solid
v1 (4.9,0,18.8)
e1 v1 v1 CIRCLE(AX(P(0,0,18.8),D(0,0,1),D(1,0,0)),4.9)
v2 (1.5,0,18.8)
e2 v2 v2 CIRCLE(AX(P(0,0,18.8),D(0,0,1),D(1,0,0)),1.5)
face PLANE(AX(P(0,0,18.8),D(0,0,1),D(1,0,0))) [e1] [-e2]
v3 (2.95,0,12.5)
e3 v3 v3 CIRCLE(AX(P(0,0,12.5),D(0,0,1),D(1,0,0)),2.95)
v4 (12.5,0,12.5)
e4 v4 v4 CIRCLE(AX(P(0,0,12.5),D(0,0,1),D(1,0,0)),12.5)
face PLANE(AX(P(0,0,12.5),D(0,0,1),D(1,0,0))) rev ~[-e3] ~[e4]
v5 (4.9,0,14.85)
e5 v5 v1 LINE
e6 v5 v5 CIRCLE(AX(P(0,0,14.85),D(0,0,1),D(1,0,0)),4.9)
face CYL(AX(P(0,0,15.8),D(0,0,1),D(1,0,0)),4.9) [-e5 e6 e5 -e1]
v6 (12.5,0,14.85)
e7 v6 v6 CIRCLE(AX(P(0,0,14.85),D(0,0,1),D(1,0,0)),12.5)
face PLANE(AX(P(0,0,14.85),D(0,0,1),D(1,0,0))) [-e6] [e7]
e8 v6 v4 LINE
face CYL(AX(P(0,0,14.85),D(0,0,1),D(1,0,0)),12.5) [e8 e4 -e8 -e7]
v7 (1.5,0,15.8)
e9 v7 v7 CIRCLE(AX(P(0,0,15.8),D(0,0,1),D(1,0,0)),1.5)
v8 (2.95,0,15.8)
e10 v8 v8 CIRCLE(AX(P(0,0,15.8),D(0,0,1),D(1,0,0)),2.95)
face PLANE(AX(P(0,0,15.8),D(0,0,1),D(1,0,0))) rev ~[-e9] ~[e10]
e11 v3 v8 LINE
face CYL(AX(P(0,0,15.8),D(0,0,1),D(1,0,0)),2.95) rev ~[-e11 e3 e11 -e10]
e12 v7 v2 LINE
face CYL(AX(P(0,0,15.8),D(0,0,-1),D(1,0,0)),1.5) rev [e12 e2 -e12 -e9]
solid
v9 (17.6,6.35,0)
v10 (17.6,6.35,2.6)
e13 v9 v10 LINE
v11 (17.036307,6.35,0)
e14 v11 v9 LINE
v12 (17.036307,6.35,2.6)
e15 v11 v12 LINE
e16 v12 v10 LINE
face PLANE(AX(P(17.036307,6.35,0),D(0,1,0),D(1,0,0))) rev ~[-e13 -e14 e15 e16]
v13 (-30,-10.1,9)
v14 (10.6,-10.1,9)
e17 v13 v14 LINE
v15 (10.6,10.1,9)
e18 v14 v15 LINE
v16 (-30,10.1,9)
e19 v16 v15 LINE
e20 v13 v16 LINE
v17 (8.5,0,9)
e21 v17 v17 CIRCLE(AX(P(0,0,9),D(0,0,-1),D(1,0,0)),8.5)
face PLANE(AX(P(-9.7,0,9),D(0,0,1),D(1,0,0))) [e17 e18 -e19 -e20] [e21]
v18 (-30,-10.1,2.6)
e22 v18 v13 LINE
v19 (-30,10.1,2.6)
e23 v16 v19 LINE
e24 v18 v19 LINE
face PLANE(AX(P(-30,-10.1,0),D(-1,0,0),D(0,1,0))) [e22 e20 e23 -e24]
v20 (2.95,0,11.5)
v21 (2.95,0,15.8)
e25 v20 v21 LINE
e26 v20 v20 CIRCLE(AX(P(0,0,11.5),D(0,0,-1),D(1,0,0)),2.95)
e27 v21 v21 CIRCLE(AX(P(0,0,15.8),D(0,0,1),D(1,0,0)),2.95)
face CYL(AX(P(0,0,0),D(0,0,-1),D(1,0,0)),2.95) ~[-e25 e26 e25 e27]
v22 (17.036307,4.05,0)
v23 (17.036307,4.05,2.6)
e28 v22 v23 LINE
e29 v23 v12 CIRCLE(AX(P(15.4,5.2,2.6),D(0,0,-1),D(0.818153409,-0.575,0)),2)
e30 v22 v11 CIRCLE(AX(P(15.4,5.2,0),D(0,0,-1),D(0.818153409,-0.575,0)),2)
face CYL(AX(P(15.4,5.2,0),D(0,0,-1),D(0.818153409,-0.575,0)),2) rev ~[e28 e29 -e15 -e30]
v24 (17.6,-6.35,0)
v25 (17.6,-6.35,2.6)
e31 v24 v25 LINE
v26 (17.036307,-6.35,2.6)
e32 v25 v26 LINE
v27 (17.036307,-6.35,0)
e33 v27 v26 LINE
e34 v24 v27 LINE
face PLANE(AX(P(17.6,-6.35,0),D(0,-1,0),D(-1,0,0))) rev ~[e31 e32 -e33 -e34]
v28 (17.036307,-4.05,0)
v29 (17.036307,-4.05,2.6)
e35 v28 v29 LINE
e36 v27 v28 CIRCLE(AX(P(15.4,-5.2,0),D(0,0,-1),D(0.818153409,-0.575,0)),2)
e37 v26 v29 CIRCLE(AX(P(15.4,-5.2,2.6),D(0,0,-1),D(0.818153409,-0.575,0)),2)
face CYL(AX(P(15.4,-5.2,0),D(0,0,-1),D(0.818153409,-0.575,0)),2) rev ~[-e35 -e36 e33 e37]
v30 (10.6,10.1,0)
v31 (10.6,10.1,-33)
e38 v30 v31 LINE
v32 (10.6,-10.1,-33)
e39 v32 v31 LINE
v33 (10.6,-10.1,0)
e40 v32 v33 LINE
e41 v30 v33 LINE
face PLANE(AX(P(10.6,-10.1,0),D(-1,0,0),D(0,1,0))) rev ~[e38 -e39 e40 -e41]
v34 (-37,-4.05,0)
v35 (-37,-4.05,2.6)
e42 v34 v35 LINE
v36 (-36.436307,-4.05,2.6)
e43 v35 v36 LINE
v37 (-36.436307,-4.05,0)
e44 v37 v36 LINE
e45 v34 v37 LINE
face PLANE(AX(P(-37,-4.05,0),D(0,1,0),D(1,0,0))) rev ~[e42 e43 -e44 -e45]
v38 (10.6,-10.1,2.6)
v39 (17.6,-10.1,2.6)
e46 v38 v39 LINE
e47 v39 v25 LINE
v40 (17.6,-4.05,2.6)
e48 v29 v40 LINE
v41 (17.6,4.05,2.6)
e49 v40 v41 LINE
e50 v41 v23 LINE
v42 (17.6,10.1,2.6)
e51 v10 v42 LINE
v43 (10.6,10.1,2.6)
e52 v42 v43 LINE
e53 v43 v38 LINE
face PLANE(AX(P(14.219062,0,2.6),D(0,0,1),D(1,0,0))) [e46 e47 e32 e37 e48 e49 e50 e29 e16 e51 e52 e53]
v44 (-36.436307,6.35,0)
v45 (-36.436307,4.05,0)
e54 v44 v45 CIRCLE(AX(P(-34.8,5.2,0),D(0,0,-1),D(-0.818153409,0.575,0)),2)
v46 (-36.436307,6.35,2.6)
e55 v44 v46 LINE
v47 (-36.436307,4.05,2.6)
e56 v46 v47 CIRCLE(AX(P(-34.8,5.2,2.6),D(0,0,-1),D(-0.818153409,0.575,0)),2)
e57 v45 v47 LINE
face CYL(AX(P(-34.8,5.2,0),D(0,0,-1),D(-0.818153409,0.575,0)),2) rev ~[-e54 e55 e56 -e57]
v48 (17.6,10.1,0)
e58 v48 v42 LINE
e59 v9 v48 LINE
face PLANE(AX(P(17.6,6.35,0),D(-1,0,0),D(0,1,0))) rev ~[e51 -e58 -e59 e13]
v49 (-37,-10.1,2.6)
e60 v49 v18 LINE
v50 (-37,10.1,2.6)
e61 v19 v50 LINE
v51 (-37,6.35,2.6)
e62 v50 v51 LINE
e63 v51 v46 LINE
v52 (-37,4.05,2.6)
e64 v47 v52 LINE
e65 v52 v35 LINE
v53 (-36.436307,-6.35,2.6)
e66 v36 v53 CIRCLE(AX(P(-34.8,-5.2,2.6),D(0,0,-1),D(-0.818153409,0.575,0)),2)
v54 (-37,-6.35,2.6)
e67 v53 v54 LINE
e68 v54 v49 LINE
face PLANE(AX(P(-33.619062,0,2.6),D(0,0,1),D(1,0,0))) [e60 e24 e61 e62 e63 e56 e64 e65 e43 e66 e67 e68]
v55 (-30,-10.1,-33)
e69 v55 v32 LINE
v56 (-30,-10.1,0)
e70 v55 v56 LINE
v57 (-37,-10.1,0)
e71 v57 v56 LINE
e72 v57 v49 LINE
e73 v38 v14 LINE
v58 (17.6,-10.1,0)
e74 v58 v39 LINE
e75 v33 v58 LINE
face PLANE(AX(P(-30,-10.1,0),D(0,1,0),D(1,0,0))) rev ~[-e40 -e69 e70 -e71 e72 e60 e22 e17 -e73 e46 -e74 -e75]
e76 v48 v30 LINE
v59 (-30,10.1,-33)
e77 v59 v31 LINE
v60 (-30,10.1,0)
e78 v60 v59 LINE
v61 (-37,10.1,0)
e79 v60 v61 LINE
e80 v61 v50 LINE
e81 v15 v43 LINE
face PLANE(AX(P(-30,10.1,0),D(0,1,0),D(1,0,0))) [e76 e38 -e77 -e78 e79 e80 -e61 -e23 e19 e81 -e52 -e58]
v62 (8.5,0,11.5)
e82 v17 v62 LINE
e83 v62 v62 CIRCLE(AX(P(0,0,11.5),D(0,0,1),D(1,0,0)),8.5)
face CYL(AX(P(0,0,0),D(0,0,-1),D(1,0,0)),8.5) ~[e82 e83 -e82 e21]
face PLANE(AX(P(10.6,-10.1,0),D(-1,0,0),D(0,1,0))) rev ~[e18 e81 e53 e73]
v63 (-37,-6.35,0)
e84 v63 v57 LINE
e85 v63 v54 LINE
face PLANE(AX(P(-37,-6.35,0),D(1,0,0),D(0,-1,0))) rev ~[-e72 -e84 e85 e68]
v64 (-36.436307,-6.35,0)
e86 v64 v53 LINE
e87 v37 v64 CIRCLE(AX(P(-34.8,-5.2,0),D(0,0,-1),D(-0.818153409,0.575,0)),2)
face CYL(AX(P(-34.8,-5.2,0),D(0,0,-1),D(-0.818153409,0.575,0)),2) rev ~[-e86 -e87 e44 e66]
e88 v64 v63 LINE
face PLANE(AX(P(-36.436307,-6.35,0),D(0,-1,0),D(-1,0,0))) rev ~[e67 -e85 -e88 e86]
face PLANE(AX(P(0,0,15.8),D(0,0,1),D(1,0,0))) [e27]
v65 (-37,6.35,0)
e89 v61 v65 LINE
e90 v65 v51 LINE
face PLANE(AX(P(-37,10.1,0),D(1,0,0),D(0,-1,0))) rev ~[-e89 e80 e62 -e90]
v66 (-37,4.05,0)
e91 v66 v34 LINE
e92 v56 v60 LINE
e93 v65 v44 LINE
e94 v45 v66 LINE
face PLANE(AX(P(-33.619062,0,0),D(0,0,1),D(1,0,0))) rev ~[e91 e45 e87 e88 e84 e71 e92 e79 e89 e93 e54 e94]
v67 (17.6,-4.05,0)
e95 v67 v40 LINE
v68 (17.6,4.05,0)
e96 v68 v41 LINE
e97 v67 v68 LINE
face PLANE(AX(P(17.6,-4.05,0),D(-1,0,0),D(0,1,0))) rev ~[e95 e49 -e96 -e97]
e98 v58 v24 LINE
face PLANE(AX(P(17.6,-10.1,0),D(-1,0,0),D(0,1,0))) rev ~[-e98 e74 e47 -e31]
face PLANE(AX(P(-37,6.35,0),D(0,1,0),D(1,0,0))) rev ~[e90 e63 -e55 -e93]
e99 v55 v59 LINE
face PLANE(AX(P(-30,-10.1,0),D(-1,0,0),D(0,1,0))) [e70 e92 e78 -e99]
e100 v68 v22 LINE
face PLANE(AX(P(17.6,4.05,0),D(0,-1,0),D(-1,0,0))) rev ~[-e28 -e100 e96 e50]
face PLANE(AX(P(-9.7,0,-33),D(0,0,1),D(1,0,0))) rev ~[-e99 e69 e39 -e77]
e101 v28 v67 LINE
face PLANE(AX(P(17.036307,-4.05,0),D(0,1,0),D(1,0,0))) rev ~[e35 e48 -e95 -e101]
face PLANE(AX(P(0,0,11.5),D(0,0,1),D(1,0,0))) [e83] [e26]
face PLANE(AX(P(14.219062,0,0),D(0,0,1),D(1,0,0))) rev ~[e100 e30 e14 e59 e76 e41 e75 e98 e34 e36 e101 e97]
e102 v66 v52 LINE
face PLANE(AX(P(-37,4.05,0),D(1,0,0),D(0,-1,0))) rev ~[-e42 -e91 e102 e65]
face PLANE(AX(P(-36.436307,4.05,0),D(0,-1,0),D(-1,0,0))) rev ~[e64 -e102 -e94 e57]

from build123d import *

# Parameters (mm, degrees)
F0_W          = 40.6
F0_H          = 20.2
F0_R          = 8.5
F0_R_2        = 2.95
F1_DEPTH      = 33
F1_DEPTH_BACK = 9
F2_DEPTH      = 2.6
F3_DEPTH      = 11.5
F4_DEPTH      = 15.8
F5_R          = 4.9
F5_R_2        = 2.95
F6_DEPTH      = 3.3
F6_DEPTH_BACK = 3
F7_START      = -0.95
F5_R_3        = 12.5
F7_DEPTH      = 2.35
F5_R_4        = 1.5
F8_DEPTH      = 3


# Not quite as in the source:
# - a feature names something its author has since deleted; it is built from what else it names


with BuildPart() as f1:
    # F0 (on Top) → F1 (new body, two sides)
    with BuildSketch(Plane.XY) as f1_sk:
        with Locations((-9.7, 0)):
            Rectangle(F0_W, F0_H)
        Circle(F0_R, mode=Mode.SUBTRACT)
        Circle(F0_R)
        Circle(F0_R_2, mode=Mode.SUBTRACT)
        Circle(F0_R_2)
    extrude(amount=-F1_DEPTH)
    extrude(f1_sk.sketch, amount=F1_DEPTH_BACK)

    # F0 (on Top) → F2 (join)
    with BuildSketch(Plane.XY):
        with BuildLine():
            Line((-30, -10.1), (-30, 10.1))
            Line((-30, 10.1), (-37, 10.1))
            Line((-37, 10.1), (-37, 6.35))
            Line((-37, 6.35), (-36.4363068172, 6.35))
            ThreePointArc((-36.4363068172, 6.35), (-32.8, 5.2), (-36.4363068172, 4.05))
            Line((-36.4363068172, 4.05), (-37, 4.05))
            Line((-37, 4.05), (-37, -4.05))
            Line((-37, -4.05), (-36.4363068172, -4.05))
            ThreePointArc((-36.4363068172, -4.05), (-32.8, -5.2), (-36.4363068172, -6.35))
            Line((-36.4363068172, -6.35), (-37, -6.35))
            Line((-37, -6.35), (-37, -10.1))
            Line((-37, -10.1), (-30, -10.1))
        make_face()
        with BuildLine():
            Line((17.6, 10.1), (10.6, 10.1))
            Line((10.6, 10.1), (10.6, -10.1))
            Line((10.6, -10.1), (17.6, -10.1))
            Line((17.6, -10.1), (17.6, -6.35))
            Line((17.6, -6.35), (17.0363068172, -6.35))
            ThreePointArc((17.0363068172, -6.35), (13.4, -5.2), (17.0363068172, -4.05))
            Line((17.0363068172, -4.05), (17.6, -4.05))
            Line((17.6, -4.05), (17.6, 4.05))
            Line((17.6, 4.05), (17.0363068172, 4.05))
            ThreePointArc((17.0363068172, 4.05), (13.4, 5.2), (17.0363068172, 6.35))
            Line((17.0363068172, 6.35), (17.6, 6.35))
            Line((17.6, 6.35), (17.6, 10.1))
        make_face()
    extrude(amount=F2_DEPTH)

    # F0 (on Top) → F3 (join)
    with BuildSketch(Plane.XY):
        Circle(F0_R)
        Circle(F0_R_2, mode=Mode.SUBTRACT)
        Circle(F0_R_2)
    extrude(amount=F3_DEPTH)

    # F0 (on Top) → F4 (join)
    with BuildSketch(Plane.XY):
        Circle(F0_R_2)
    extrude(amount=F4_DEPTH)


with BuildPart() as f6:
    # F5 (on face) → F6 (new body, two sides)
    with BuildSketch(Plane.XY.offset(15.8)) as f6_sk:
        Circle(F5_R)
        Circle(F5_R_2, mode=Mode.SUBTRACT)
    extrude(amount=-F6_DEPTH)
    extrude(f6_sk.sketch, amount=F6_DEPTH_BACK)

    # F5 (on face) → F7 (join)
    with BuildSketch(Plane.XY.offset(15.8).offset(F7_START)):
        Circle(F5_R_3)
        Circle(F5_R, mode=Mode.SUBTRACT)
        Circle(F5_R)
        Circle(F5_R_2, mode=Mode.SUBTRACT)
    extrude(amount=-F7_DEPTH)

    # F5 (on face) → F8 (join)
    with BuildSketch(Plane.XY.offset(15.8)):
        Circle(F5_R_2)
        Circle(F5_R_4, mode=Mode.SUBTRACT)
    extrude(amount=F8_DEPTH)


solid = Compound([f1.part, f6.part])
